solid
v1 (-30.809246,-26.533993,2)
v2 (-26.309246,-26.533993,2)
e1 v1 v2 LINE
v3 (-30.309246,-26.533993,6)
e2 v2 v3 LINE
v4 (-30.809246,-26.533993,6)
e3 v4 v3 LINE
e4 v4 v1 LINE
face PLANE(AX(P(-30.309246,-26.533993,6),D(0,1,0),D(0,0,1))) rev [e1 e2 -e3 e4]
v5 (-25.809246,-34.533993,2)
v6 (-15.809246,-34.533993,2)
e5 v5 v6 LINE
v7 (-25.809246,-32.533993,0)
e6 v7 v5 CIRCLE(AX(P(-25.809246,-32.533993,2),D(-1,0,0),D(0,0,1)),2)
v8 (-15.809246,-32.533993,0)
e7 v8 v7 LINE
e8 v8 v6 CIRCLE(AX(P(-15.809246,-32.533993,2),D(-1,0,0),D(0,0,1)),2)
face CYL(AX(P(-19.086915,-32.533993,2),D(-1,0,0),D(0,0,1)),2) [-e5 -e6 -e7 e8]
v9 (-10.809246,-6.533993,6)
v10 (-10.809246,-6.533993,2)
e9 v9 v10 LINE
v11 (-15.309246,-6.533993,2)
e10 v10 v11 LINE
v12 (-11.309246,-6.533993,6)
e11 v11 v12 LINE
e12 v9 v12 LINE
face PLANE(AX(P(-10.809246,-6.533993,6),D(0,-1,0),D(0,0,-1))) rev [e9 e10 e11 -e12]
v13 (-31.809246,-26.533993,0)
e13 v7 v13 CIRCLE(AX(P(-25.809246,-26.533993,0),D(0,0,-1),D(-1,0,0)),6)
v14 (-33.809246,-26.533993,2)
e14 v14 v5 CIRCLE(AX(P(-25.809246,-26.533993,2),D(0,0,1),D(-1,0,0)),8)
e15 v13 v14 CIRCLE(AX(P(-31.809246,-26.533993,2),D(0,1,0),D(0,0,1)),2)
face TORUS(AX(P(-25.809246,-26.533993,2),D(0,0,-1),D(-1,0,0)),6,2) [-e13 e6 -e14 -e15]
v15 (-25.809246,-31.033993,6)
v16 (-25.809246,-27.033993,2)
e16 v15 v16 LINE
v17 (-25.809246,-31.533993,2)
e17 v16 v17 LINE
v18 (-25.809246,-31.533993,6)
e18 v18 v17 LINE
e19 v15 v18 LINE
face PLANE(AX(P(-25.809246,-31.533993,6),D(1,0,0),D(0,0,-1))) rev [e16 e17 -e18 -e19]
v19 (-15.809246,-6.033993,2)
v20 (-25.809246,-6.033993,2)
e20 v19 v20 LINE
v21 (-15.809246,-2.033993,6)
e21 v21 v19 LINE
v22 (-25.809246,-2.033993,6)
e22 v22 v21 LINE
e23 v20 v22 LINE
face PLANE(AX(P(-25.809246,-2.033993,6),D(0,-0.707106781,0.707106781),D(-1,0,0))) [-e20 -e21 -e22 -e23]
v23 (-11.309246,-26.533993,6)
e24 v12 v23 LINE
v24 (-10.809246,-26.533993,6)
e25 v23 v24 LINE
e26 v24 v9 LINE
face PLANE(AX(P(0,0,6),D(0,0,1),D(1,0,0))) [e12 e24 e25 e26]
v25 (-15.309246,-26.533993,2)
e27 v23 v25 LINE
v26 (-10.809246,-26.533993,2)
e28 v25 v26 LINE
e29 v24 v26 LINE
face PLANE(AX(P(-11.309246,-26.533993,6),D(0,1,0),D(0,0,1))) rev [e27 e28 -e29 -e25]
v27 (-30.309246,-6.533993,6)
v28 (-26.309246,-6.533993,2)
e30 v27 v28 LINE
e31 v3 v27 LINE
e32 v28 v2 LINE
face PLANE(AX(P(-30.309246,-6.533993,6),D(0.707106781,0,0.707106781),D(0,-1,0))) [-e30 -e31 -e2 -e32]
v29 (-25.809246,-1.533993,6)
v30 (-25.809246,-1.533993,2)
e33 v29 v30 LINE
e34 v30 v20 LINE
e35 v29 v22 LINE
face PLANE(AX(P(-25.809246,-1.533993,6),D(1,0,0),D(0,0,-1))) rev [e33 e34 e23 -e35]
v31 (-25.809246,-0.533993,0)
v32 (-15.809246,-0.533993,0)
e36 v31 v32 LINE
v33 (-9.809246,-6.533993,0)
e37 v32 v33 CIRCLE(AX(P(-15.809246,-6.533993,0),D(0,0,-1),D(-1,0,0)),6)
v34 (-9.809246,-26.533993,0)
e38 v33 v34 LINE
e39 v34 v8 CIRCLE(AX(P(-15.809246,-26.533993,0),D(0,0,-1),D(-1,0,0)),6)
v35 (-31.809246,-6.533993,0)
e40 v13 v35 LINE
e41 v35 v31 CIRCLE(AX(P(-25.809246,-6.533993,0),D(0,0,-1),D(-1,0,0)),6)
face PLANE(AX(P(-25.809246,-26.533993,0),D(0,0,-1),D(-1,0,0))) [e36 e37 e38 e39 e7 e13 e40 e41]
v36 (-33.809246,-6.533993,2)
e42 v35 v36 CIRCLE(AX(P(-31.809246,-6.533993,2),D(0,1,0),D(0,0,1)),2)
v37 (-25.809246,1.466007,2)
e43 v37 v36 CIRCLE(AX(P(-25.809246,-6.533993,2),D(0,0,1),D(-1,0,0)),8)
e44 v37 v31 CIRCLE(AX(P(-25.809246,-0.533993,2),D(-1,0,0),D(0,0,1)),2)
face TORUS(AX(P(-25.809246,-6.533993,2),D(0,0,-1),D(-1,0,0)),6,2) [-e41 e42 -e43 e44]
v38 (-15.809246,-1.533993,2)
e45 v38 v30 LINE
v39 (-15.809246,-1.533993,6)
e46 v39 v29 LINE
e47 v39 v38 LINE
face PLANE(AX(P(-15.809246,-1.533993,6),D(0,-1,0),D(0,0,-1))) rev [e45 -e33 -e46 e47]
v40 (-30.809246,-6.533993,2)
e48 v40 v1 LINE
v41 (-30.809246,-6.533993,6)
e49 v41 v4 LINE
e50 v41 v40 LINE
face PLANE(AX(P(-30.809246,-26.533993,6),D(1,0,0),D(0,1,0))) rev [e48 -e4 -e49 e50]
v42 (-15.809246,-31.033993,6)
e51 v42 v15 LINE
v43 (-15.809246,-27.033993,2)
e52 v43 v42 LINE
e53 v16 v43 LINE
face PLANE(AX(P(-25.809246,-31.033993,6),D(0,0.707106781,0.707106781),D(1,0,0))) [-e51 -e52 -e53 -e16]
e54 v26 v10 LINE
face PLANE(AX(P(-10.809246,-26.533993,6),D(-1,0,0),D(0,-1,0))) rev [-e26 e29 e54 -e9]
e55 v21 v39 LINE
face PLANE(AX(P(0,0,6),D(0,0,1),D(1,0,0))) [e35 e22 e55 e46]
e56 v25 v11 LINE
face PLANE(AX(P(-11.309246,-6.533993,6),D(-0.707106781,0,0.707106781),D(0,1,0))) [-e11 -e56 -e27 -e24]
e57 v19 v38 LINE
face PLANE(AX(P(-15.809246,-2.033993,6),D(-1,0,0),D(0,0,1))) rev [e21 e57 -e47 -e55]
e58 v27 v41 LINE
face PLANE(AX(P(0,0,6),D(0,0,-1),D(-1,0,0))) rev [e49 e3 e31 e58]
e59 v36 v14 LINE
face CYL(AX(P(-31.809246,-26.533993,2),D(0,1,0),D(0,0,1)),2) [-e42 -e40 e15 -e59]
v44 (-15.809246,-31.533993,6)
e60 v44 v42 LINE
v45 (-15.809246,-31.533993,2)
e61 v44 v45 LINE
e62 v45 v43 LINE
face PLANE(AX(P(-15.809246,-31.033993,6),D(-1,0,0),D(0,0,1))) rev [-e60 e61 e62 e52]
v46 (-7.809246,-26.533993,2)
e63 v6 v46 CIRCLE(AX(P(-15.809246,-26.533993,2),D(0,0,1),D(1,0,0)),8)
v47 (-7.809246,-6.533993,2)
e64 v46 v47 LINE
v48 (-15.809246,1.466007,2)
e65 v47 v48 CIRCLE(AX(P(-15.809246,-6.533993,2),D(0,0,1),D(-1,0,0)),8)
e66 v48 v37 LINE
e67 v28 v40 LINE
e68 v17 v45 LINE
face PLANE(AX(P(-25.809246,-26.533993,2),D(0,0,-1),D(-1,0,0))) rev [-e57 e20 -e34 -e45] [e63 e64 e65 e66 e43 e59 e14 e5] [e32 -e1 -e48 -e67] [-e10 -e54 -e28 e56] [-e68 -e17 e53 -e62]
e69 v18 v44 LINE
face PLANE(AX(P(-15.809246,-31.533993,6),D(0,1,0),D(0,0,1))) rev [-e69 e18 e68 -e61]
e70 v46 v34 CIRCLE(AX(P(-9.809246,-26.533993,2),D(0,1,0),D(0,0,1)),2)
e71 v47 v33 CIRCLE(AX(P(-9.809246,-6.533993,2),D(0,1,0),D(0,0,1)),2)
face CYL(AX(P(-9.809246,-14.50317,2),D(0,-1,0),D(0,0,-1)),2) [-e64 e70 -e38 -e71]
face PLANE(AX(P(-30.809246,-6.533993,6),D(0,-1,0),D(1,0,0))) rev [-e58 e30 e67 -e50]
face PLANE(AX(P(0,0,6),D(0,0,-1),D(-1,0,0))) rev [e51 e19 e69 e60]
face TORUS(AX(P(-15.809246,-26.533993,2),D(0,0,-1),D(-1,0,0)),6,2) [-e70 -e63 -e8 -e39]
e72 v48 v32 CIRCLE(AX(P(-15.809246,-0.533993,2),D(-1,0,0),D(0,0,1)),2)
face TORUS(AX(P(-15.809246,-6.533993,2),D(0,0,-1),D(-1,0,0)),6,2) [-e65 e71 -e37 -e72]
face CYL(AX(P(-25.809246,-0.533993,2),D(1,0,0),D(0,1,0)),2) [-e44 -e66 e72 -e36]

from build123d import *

# Parameters (mm, degrees)
EXTRUDE_1_DEPTH = 2
SKETCH_2_W      = 0.5
SKETCH_2_H      = 20
SKETCH_2_W_2    = 10
SKETCH_2_H_2    = 0.5
EXTRUDE_2_DEPTH = 4
CHAMFER_1_SIZE  = 4
FILLET_1_R      = 2


with BuildPart() as part:
    # Эскиз1 → Бобышка-Вытянуть1 (new body)
    with BuildSketch(Plane.XY):
        with BuildLine():
            Line((-25.809245543, -34.533993398), (-22.574730597, -34.533993398))
            Line((-22.574730597, -34.533993398), (-19.086915297, -34.533993398))
            Line((-19.086915297, -34.533993398), (-15.809245543, -34.533993398))
            ThreePointArc((-15.809245543, -34.533993398), (-10.152391293, -32.190847647), (-7.809245543, -26.533993398))
            Line((-7.809245543, -26.533993398), (-7.809245543, -18.565345077))
            Line((-7.809245543, -18.565345077), (-7.809245543, -14.503170045))
            Line((-7.809245543, -14.503170045), (-7.809245543, -6.533993398))
            ThreePointArc((-7.809245543, -6.533993398), (-10.152391293, -0.877139148), (-15.809245543, 1.466006602))
            Line((-15.809245543, 1.466006602), (-19.086915297, 1.466006602))
            Line((-19.086915297, 1.466006602), (-22.574730597, 1.466006602))
            Line((-22.574730597, 1.466006602), (-25.809245543, 1.466006602))
            ThreePointArc((-25.809245543, 1.466006602), (-31.466099792, -0.877139148), (-33.809245543, -6.533993398))
            Line((-33.809245543, -6.533993398), (-33.809245543, -14.503170045))
            Line((-33.809245543, -14.503170045), (-33.809245543, -18.565345077))
            Line((-33.809245543, -18.565345077), (-33.809245543, -26.533993398))
            ThreePointArc((-33.809245543, -26.533993398), (-31.466099792, -32.190847647), (-25.809245543, -34.533993398))
        make_face()
    extrude(amount=EXTRUDE_1_DEPTH)

    # Эскиз2 → Бобышка-Вытянуть2 (add)
    with BuildSketch(Plane.XY.offset(2)):
        with Locations((-30.559245543, -16.533993398)):
            Rectangle(SKETCH_2_W, SKETCH_2_H)
        with Locations((-20.809245543, -31.283993398)):
            Rectangle(SKETCH_2_W_2, SKETCH_2_H_2)
        with Locations((-11.059245543, -16.533993398)):
            Rectangle(SKETCH_2_W, SKETCH_2_H)
        with Locations((-20.809245543, -1.783993398)):
            Rectangle(SKETCH_2_W_2, SKETCH_2_H_2)
    extrude(amount=EXTRUDE_2_DEPTH)

    # Фаска1
    chamfer_1_edges = [part.edges().sort_by_distance(p)[0] for p in [
        (-20.809245543, -31.033993398, 2),
        (-30.309245543, -16.533993398, 2),
        (-20.809245543, -2.033993398, 2),
        (-11.309245543, -16.533993398, 2),
    ]]
    chamfer(chamfer_1_edges, length=CHAMFER_1_SIZE - 0.0001)  # a hair under: the kernel refuses the full size

    # Скругление1
    fillet_1_edges = [part.edges().sort_by_distance(p)[0] for p in [
        (-31.466099792, -0.877139148, 0),
        (-20.809245543, 1.466006602, 0),
        (-10.152391293, -0.877139148, 0),
        (-7.809245543, -16.533993398, 0),
        (-10.152391293, -32.190847647, 0),
        (-20.809245543, -34.533993398, 0),
        (-31.466099792, -32.190847647, 0),
        (-33.809245543, -16.533993398, 0),
    ]]
    fillet(fillet_1_edges, radius=FILLET_1_R - 0.0001)  # a hair under: the kernel refuses the full size


solid = part.part
